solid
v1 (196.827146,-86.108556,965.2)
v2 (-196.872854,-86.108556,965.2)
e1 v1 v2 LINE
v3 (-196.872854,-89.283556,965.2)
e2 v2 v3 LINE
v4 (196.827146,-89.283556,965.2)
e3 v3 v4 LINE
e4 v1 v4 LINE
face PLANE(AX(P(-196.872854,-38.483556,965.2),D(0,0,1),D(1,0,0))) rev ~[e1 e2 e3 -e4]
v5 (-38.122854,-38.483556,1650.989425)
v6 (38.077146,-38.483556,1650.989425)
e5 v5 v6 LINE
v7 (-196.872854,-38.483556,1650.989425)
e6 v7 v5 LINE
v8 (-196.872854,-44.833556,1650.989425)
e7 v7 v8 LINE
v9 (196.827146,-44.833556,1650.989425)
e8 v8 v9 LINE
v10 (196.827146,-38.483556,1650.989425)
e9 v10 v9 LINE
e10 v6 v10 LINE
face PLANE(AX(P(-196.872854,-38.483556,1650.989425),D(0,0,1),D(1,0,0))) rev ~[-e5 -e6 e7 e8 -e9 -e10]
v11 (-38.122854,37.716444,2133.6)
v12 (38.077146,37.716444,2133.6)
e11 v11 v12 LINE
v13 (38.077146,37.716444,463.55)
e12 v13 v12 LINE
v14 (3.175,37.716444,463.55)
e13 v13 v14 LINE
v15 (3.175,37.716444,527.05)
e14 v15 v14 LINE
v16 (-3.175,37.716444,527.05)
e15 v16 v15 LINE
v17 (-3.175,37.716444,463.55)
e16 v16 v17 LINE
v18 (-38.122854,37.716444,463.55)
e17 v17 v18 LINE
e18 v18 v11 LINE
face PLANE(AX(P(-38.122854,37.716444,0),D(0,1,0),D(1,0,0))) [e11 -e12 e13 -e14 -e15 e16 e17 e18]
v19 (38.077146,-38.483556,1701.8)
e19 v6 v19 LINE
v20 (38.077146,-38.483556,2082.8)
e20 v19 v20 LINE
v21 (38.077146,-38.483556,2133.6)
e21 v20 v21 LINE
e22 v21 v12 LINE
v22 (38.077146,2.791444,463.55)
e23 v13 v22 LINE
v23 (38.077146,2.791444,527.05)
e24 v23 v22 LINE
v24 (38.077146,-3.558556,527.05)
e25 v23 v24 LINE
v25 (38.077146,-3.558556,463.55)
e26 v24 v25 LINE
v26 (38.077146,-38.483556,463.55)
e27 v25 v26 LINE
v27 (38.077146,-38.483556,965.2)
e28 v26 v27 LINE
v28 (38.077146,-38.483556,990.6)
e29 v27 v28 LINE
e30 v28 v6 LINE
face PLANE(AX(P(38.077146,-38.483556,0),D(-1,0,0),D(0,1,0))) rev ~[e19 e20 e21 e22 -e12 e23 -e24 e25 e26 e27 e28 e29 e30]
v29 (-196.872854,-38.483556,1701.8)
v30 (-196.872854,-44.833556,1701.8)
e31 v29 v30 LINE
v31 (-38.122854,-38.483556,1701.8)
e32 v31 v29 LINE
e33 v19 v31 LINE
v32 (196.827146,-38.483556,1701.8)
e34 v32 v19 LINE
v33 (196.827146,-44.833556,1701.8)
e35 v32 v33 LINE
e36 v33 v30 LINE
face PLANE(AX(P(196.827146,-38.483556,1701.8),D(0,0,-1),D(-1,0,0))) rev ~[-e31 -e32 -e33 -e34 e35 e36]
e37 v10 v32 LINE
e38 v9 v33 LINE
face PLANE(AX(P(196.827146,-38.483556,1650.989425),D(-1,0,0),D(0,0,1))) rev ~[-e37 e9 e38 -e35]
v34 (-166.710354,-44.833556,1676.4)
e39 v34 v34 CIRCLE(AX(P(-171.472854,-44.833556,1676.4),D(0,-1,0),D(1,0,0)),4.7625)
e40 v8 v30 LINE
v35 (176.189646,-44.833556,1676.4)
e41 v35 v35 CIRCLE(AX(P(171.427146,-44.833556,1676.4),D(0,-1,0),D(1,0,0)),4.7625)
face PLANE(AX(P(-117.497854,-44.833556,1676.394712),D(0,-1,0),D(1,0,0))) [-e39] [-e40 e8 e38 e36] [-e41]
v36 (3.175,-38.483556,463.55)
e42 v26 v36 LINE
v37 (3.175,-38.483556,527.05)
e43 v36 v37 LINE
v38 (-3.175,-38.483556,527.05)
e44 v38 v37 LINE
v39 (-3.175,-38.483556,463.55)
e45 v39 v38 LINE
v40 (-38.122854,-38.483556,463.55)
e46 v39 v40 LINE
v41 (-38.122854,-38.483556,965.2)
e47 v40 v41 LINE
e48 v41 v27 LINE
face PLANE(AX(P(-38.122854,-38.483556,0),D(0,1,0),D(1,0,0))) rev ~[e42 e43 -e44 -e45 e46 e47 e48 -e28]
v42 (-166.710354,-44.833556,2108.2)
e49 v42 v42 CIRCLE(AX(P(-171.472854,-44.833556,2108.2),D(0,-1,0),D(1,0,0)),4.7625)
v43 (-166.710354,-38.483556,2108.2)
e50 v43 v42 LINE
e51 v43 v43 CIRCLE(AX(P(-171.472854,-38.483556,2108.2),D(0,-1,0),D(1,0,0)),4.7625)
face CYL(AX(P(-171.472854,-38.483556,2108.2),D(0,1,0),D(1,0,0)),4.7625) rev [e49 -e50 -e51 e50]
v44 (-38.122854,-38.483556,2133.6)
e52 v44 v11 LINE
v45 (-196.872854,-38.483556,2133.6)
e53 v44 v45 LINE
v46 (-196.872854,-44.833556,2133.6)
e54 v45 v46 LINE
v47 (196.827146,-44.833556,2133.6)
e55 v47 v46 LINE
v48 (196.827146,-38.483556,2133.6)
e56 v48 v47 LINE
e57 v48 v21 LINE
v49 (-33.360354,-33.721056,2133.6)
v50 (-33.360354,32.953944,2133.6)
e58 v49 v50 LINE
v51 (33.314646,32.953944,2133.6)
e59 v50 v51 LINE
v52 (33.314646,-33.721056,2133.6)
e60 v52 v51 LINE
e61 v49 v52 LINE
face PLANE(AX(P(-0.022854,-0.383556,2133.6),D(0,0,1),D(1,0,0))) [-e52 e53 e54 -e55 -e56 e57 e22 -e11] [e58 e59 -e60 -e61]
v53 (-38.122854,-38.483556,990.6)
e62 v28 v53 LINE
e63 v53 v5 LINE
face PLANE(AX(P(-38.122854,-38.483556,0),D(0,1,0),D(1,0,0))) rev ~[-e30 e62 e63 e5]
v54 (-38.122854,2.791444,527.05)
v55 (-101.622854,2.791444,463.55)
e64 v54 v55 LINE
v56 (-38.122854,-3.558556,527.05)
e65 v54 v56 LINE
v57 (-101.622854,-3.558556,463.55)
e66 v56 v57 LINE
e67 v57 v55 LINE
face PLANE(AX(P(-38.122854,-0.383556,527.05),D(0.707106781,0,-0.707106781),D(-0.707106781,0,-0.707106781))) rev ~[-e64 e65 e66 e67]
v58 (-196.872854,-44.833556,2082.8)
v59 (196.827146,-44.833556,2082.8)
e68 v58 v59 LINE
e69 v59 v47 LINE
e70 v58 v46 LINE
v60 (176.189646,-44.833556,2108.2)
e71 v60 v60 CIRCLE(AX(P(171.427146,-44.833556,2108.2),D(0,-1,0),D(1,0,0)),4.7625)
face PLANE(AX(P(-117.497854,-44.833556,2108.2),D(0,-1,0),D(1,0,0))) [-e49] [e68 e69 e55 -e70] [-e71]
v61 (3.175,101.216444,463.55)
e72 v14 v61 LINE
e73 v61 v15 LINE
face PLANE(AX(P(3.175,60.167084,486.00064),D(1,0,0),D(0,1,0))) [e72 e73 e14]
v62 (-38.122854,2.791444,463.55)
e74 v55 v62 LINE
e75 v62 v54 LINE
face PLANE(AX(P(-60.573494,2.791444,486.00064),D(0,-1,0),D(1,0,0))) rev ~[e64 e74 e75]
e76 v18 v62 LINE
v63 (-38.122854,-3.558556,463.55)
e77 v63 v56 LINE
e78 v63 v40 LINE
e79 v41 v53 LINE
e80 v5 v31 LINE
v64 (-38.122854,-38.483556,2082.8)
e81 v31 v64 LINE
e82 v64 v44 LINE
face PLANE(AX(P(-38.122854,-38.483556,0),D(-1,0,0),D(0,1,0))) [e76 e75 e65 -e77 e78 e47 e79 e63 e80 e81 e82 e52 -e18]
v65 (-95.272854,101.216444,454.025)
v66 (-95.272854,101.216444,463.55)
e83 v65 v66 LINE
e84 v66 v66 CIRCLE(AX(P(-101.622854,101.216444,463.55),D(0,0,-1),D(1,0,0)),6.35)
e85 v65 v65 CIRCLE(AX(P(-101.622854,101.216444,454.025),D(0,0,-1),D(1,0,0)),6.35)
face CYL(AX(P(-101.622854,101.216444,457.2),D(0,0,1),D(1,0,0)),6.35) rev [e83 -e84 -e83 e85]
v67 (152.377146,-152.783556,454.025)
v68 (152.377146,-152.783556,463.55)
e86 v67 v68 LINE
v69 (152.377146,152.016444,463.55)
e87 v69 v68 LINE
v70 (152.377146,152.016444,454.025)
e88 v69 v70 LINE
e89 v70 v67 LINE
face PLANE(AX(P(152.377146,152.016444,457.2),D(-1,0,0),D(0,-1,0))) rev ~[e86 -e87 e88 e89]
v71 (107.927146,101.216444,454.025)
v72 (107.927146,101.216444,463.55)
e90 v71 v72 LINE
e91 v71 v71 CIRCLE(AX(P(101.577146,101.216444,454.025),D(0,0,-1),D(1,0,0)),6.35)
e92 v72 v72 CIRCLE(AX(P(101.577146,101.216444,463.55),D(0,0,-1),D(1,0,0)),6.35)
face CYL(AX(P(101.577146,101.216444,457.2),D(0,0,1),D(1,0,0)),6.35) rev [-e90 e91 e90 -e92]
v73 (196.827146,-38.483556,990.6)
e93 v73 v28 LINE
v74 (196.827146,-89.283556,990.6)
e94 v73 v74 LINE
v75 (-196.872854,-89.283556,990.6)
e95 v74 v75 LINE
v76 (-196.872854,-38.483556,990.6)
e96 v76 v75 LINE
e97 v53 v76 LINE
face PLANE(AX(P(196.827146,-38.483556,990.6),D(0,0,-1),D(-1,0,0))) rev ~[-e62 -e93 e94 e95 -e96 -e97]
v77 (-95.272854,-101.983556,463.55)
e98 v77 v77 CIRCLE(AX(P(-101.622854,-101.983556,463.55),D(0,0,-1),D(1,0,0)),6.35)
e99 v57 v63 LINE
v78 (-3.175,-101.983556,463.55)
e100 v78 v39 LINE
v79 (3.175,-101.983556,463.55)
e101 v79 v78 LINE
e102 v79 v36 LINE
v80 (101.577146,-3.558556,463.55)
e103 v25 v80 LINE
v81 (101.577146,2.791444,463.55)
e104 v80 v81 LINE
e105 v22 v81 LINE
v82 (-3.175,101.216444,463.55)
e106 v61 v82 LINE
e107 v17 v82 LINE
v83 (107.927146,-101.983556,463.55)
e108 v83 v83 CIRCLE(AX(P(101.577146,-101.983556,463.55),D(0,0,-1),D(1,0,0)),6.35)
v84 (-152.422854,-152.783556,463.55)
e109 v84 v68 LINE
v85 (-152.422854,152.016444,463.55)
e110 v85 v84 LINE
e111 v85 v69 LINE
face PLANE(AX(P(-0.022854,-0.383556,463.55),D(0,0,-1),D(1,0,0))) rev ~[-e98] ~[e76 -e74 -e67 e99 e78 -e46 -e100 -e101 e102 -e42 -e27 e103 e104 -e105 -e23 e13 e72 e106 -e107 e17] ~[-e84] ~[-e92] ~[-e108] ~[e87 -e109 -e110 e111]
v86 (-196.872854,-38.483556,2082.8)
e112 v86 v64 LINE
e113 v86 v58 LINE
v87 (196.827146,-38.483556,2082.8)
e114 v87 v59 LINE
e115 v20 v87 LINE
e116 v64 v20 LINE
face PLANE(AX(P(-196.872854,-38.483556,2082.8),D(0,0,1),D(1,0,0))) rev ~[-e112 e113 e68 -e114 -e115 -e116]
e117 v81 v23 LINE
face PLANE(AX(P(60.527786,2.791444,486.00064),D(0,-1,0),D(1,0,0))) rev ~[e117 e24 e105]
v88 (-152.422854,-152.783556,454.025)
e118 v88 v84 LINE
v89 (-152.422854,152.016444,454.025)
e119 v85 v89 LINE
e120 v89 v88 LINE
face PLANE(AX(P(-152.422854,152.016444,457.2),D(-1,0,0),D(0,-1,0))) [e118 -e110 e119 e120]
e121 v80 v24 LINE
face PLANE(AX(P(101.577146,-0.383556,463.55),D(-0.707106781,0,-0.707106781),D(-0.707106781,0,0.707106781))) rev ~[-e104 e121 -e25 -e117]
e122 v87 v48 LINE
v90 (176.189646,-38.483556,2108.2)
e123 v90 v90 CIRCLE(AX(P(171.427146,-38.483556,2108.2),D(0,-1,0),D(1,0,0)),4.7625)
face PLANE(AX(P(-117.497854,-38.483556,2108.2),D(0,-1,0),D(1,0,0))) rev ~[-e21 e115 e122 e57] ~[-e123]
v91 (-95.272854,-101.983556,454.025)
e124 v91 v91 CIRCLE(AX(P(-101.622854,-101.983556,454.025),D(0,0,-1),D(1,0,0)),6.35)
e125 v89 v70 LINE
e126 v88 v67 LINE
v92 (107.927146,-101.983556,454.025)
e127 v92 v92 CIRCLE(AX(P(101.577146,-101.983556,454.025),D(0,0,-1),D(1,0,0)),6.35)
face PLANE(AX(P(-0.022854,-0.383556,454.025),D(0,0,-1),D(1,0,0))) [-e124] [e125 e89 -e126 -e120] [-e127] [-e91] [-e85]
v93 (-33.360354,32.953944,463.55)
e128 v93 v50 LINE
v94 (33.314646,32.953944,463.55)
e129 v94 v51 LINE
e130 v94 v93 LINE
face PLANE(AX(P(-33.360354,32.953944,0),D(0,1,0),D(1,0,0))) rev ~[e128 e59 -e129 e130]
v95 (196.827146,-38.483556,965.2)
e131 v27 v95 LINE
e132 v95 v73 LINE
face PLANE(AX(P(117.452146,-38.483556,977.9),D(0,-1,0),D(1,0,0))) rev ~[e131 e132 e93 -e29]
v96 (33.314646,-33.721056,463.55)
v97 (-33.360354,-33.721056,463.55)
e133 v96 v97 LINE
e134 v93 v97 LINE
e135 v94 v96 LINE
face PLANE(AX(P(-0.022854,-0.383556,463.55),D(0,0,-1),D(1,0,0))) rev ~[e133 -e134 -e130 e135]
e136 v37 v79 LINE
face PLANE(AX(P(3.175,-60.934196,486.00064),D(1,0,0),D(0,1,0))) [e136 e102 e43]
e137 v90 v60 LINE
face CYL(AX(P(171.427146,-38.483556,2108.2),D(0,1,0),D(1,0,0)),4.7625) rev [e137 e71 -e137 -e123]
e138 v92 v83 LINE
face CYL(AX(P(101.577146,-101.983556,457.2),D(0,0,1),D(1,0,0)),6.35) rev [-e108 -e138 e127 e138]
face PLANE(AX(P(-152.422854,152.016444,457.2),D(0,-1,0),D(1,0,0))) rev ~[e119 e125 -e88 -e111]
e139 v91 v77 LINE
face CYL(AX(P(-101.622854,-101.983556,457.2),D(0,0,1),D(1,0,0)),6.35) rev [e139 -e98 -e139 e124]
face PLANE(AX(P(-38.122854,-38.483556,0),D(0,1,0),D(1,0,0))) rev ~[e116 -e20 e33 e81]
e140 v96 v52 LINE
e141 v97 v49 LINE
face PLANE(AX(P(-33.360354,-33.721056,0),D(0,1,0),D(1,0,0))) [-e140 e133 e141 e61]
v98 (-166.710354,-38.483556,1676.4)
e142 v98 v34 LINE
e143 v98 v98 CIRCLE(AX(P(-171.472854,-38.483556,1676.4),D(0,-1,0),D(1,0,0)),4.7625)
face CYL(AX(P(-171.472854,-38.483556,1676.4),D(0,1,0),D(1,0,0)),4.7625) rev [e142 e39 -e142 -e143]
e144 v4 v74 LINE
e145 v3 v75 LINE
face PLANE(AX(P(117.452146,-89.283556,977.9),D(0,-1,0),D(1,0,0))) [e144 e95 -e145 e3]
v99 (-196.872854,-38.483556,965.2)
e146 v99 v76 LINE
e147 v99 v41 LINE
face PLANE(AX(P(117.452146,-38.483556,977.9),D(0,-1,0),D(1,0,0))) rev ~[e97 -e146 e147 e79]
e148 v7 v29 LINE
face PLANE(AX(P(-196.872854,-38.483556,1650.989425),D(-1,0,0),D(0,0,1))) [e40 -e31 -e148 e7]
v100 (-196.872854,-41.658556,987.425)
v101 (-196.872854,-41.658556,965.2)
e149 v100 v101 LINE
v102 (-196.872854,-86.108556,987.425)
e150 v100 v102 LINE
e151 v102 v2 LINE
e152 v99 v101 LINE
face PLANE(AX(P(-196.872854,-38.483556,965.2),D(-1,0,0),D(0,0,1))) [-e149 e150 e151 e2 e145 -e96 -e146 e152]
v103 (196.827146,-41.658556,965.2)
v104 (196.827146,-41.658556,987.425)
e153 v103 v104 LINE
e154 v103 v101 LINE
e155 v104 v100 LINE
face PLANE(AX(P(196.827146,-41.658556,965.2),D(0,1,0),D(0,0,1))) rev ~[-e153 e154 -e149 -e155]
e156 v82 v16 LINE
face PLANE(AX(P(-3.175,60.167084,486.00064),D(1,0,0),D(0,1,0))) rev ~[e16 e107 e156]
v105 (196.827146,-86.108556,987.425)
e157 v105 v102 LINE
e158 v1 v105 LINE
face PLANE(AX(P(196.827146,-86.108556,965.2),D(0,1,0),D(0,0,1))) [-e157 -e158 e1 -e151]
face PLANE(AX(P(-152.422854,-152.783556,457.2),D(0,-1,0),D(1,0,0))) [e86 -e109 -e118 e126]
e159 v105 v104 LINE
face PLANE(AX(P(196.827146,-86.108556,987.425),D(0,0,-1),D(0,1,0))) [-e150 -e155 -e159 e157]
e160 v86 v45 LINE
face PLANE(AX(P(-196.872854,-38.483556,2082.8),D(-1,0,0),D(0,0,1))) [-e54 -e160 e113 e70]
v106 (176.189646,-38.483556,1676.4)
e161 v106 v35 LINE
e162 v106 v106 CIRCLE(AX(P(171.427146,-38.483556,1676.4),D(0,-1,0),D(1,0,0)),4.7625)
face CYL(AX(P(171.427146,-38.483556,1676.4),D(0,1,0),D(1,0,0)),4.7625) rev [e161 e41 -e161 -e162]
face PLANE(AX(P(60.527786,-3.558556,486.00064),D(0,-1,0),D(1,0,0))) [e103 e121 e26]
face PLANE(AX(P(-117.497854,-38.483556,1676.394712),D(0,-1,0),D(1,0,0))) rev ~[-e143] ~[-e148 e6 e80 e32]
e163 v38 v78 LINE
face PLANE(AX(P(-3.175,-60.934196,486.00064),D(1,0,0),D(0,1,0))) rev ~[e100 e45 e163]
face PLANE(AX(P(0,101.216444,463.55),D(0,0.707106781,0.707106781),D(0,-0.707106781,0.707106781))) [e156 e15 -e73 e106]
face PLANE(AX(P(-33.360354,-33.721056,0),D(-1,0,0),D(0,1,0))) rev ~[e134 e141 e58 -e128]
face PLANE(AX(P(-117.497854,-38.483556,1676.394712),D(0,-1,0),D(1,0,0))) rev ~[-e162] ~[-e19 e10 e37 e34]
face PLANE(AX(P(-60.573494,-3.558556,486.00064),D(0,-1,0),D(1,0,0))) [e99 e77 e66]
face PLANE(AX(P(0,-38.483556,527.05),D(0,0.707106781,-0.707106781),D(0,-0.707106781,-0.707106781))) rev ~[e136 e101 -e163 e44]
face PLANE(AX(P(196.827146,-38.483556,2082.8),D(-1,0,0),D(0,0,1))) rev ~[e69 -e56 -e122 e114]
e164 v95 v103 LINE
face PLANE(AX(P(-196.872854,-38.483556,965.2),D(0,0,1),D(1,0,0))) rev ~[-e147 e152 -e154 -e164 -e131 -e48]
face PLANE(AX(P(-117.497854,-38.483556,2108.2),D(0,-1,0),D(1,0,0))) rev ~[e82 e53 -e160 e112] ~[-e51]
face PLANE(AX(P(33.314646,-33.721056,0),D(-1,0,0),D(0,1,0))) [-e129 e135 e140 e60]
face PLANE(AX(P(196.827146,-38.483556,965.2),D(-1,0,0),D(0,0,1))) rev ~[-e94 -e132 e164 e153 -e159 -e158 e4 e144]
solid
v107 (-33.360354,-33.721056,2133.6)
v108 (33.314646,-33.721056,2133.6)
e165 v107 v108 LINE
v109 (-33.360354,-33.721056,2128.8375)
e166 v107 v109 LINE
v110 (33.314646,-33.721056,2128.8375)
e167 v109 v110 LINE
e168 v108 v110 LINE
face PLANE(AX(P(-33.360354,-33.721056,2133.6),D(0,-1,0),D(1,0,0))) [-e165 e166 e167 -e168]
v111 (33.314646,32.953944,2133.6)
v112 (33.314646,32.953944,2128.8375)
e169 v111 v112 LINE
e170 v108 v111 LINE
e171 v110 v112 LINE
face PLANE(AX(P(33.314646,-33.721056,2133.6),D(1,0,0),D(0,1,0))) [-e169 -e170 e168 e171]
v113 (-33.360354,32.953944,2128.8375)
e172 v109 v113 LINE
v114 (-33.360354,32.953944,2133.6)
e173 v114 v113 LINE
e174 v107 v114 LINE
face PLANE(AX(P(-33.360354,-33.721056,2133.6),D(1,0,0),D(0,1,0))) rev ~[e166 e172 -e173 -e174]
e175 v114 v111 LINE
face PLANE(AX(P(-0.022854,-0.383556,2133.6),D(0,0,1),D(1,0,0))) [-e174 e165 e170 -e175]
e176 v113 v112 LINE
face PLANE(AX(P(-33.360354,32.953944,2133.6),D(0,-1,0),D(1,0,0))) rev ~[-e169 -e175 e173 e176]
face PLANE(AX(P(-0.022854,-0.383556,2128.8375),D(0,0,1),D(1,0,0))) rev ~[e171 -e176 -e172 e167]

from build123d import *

# Parameters (mm, degrees)
F0_W      = 76.2
F0_H      = 76.2
F0_W_2    = 66.675
F0_H_2    = 66.675
F1_DEPTH  = 2133.6
F2_W      = 66.675
F2_H      = 66.675
F4_DEPTH  = 4.7625
F6_DEPTH  = 457.2
F8_W      = 304.8
F8_H      = 304.8
F8_R      = 6.35
F9_DEPTH  = 6.35
F12_DEPTH = 3.175
F13_DEPTH = 3.175
F15_DEPTH = 3.175
F16_DEPTH = 3.175
F17_DEPTH = 3.175
F5_W      = 158.75
F5_H      = 50.8105754852
F5_R      = 4.7625
F5_W_2    = 76.2
F5_H_2    = 50.8
F18_DEPTH = 6.35
F19_W     = 158.75
F19_H     = 25.4
F19_W_2   = 76.2
F20_DEPTH = 50.8
F21_W     = 44.45
F21_H     = 22.225
F22_DEPTH = 508


# Not quite as in the source:
# - a feature names something its author has since deleted; it is built from what else it names


with BuildPart() as f1:
    # F0 (on Top) → F1 (new body)
    with BuildSketch(Plane.XY):
        with Locations((-0.0228539575, -0.3835560492)):
            Rectangle(F0_W, F0_H)
        with Locations((-0.0228539575, -0.3835560492)):
            Rectangle(F0_W_2, F0_H_2, mode=Mode.SUBTRACT)
    extrude(amount=F1_DEPTH)

    # F6 (cut): a face of the model
    f6_faces = [f1.faces().sort_by_distance(p)[0] for p in [
        (-0.0228539575, 36.6388132163, 0),
    ]]
    extrude(f6_faces, amount=-F6_DEPTH, mode=Mode.SUBTRACT)

    # F8 (on offset) → F9 (join)
    with BuildSketch(Plane(origin=(0, 0, 457.2), x_dir=(1, 0, 0), z_dir=(0, 0, -1))):
        with Locations((-0.0228539575, 0.3835560492)):
            Rectangle(F8_W, F8_H)
        with Locations((-101.6228539575, -101.2164439508)):
            Circle(F8_R, mode=Mode.SUBTRACT)
        with Locations((101.5771460425, -101.2164439508)):
            Circle(F8_R, mode=Mode.SUBTRACT)
        with Locations((-101.6228539575, 101.9835560492)):
            Circle(F8_R, mode=Mode.SUBTRACT)
        with Locations((101.5771460425, 101.9835560492)):
            Circle(F8_R, mode=Mode.SUBTRACT)
    extrude(amount=-F9_DEPTH)

    # F8 (on offset) → F12 (join)
    with BuildSketch(Plane(origin=(0, 0, 457.2), x_dir=(1, 0, 0), z_dir=(0, 0, -1))):
        with Locations((-0.0228539575, 0.3835560492)):
            Rectangle(F8_W, F8_H)
        with Locations((-101.6228539575, -101.2164439508)):
            Circle(F8_R, mode=Mode.SUBTRACT)
        with Locations((101.5771460425, -101.2164439508)):
            Circle(F8_R, mode=Mode.SUBTRACT)
        with Locations((-101.6228539575, 101.9835560492)):
            Circle(F8_R, mode=Mode.SUBTRACT)
        with Locations((101.5771460425, 101.9835560492)):
            Circle(F8_R, mode=Mode.SUBTRACT)
    extrude(amount=F12_DEPTH)

    # F11 (on offset) → F13 (join)
    with BuildSketch(Plane.XZ.offset(0.3835560492)):
        Polygon((101.5771460425, 463.55), (38.0771460425, 527.05), (38.0771460425, 463.55), align=None)
        Polygon((-38.1228539575, 463.55), (-38.1228539575, 527.05), (-101.6228539575, 463.55), align=None)
    extrude(amount=-F13_DEPTH)

    # F14 (on Right) → F15 (join)
    with BuildSketch(Plane.YZ):
        Polygon((101.2164439508, 463.55), (37.7164439508, 527.05), (37.7164439508, 463.55), align=None)
        Polygon((-38.4835560492, 463.55), (-38.4835560492, 527.05), (-101.9835560492, 463.55), align=None)
    extrude(amount=F15_DEPTH)

    # F14 (on Right) → F16 (join)
    with BuildSketch(Plane.YZ):
        Polygon((101.2164439508, 463.55), (37.7164439508, 527.05), (37.7164439508, 463.55), align=None)
        Polygon((-38.4835560492, 463.55), (-38.4835560492, 527.05), (-101.9835560492, 463.55), align=None)
    extrude(amount=-F16_DEPTH)

    # F11 (on offset) + F13_face (on face) → F17 (join)
    with BuildSketch(Plane.XZ.offset(0.3835560492)):
        Polygon((101.5771460425, 463.55), (38.0771460425, 527.05), (38.0771460425, 463.55), align=None)
        Polygon((-38.1228539575, 463.55), (-38.1228539575, 527.05), (-101.6228539575, 463.55), align=None)
    with BuildSketch(Plane(origin=(59.2438127092, -0.3835560492, 484.7166666667), x_dir=(1, 0, 0), z_dir=(0, -1, 0))):
        Polygon((42.3333333333, -21.1666666667), (-21.1666666667, 42.3333333333), (-21.1666666667, -21.1666666667), align=None)
    extrude(amount=F17_DEPTH)

    # F5 (on face) → F18 (join)
    with BuildSketch(Plane.XZ.offset(38.4835560492)):
        with Locations((-117.4978539575, 1676.3947122574)):
            Rectangle(F5_W, F5_H)
        with Locations((-171.4728539575, 1676.4)):
            Circle(F5_R, mode=Mode.SUBTRACT)
        with Locations((117.4521460425, 1676.3947122574)):
            Rectangle(F5_W, F5_H)
        with Locations((171.4271460425, 1676.4)):
            Circle(F5_R, mode=Mode.SUBTRACT)
        with Locations((-0.0228539575, 1676.3947122574)):
            Rectangle(F5_W_2, F5_H)
        with Locations((-117.4978539575, 2108.2)):
            Rectangle(F5_W, F5_H_2)
        with Locations((-171.4728539575, 2108.2)):
            Circle(F5_R, mode=Mode.SUBTRACT)
        with Locations((-0.0228539575, 2108.2)):
            Rectangle(F5_W_2, F5_H_2)
        with Locations((117.4521460425, 2108.2)):
            Rectangle(F5_W, F5_H_2)
        with Locations((171.4271460425, 2108.2)):
            Circle(F5_R, mode=Mode.SUBTRACT)
    extrude(amount=F18_DEPTH)

    # F19 (on face) → F20 (join)
    with BuildSketch(Plane.XZ.offset(38.4835560492)):
        with Locations((117.4521460425, 977.9)):
            Rectangle(F19_W, F19_H)
        with Locations((-0.0228539575, 977.9)):
            Rectangle(F19_W_2, F19_H)
        with Locations((-117.4978539575, 977.9)):
            Rectangle(F19_W, F19_H)
    extrude(amount=F20_DEPTH)

    # F21 (on face) → F22 (cut)
    with BuildSketch(Plane.YZ.offset(196.8271460425)):
        with Locations((-63.8835560492, 976.3125)):
            Rectangle(F21_W, F21_H)
    extrude(amount=-F22_DEPTH, mode=Mode.SUBTRACT)


with BuildPart() as f4:
    # F2 (on face) → F4 (new body)
    with BuildSketch(Plane.XY.offset(2133.6)):
        with Locations((-0.0228539575, -0.3835560492)):
            Rectangle(F2_W, F2_H)
    extrude(amount=-F4_DEPTH)


solid = Compound([f1.part, f4.part])
